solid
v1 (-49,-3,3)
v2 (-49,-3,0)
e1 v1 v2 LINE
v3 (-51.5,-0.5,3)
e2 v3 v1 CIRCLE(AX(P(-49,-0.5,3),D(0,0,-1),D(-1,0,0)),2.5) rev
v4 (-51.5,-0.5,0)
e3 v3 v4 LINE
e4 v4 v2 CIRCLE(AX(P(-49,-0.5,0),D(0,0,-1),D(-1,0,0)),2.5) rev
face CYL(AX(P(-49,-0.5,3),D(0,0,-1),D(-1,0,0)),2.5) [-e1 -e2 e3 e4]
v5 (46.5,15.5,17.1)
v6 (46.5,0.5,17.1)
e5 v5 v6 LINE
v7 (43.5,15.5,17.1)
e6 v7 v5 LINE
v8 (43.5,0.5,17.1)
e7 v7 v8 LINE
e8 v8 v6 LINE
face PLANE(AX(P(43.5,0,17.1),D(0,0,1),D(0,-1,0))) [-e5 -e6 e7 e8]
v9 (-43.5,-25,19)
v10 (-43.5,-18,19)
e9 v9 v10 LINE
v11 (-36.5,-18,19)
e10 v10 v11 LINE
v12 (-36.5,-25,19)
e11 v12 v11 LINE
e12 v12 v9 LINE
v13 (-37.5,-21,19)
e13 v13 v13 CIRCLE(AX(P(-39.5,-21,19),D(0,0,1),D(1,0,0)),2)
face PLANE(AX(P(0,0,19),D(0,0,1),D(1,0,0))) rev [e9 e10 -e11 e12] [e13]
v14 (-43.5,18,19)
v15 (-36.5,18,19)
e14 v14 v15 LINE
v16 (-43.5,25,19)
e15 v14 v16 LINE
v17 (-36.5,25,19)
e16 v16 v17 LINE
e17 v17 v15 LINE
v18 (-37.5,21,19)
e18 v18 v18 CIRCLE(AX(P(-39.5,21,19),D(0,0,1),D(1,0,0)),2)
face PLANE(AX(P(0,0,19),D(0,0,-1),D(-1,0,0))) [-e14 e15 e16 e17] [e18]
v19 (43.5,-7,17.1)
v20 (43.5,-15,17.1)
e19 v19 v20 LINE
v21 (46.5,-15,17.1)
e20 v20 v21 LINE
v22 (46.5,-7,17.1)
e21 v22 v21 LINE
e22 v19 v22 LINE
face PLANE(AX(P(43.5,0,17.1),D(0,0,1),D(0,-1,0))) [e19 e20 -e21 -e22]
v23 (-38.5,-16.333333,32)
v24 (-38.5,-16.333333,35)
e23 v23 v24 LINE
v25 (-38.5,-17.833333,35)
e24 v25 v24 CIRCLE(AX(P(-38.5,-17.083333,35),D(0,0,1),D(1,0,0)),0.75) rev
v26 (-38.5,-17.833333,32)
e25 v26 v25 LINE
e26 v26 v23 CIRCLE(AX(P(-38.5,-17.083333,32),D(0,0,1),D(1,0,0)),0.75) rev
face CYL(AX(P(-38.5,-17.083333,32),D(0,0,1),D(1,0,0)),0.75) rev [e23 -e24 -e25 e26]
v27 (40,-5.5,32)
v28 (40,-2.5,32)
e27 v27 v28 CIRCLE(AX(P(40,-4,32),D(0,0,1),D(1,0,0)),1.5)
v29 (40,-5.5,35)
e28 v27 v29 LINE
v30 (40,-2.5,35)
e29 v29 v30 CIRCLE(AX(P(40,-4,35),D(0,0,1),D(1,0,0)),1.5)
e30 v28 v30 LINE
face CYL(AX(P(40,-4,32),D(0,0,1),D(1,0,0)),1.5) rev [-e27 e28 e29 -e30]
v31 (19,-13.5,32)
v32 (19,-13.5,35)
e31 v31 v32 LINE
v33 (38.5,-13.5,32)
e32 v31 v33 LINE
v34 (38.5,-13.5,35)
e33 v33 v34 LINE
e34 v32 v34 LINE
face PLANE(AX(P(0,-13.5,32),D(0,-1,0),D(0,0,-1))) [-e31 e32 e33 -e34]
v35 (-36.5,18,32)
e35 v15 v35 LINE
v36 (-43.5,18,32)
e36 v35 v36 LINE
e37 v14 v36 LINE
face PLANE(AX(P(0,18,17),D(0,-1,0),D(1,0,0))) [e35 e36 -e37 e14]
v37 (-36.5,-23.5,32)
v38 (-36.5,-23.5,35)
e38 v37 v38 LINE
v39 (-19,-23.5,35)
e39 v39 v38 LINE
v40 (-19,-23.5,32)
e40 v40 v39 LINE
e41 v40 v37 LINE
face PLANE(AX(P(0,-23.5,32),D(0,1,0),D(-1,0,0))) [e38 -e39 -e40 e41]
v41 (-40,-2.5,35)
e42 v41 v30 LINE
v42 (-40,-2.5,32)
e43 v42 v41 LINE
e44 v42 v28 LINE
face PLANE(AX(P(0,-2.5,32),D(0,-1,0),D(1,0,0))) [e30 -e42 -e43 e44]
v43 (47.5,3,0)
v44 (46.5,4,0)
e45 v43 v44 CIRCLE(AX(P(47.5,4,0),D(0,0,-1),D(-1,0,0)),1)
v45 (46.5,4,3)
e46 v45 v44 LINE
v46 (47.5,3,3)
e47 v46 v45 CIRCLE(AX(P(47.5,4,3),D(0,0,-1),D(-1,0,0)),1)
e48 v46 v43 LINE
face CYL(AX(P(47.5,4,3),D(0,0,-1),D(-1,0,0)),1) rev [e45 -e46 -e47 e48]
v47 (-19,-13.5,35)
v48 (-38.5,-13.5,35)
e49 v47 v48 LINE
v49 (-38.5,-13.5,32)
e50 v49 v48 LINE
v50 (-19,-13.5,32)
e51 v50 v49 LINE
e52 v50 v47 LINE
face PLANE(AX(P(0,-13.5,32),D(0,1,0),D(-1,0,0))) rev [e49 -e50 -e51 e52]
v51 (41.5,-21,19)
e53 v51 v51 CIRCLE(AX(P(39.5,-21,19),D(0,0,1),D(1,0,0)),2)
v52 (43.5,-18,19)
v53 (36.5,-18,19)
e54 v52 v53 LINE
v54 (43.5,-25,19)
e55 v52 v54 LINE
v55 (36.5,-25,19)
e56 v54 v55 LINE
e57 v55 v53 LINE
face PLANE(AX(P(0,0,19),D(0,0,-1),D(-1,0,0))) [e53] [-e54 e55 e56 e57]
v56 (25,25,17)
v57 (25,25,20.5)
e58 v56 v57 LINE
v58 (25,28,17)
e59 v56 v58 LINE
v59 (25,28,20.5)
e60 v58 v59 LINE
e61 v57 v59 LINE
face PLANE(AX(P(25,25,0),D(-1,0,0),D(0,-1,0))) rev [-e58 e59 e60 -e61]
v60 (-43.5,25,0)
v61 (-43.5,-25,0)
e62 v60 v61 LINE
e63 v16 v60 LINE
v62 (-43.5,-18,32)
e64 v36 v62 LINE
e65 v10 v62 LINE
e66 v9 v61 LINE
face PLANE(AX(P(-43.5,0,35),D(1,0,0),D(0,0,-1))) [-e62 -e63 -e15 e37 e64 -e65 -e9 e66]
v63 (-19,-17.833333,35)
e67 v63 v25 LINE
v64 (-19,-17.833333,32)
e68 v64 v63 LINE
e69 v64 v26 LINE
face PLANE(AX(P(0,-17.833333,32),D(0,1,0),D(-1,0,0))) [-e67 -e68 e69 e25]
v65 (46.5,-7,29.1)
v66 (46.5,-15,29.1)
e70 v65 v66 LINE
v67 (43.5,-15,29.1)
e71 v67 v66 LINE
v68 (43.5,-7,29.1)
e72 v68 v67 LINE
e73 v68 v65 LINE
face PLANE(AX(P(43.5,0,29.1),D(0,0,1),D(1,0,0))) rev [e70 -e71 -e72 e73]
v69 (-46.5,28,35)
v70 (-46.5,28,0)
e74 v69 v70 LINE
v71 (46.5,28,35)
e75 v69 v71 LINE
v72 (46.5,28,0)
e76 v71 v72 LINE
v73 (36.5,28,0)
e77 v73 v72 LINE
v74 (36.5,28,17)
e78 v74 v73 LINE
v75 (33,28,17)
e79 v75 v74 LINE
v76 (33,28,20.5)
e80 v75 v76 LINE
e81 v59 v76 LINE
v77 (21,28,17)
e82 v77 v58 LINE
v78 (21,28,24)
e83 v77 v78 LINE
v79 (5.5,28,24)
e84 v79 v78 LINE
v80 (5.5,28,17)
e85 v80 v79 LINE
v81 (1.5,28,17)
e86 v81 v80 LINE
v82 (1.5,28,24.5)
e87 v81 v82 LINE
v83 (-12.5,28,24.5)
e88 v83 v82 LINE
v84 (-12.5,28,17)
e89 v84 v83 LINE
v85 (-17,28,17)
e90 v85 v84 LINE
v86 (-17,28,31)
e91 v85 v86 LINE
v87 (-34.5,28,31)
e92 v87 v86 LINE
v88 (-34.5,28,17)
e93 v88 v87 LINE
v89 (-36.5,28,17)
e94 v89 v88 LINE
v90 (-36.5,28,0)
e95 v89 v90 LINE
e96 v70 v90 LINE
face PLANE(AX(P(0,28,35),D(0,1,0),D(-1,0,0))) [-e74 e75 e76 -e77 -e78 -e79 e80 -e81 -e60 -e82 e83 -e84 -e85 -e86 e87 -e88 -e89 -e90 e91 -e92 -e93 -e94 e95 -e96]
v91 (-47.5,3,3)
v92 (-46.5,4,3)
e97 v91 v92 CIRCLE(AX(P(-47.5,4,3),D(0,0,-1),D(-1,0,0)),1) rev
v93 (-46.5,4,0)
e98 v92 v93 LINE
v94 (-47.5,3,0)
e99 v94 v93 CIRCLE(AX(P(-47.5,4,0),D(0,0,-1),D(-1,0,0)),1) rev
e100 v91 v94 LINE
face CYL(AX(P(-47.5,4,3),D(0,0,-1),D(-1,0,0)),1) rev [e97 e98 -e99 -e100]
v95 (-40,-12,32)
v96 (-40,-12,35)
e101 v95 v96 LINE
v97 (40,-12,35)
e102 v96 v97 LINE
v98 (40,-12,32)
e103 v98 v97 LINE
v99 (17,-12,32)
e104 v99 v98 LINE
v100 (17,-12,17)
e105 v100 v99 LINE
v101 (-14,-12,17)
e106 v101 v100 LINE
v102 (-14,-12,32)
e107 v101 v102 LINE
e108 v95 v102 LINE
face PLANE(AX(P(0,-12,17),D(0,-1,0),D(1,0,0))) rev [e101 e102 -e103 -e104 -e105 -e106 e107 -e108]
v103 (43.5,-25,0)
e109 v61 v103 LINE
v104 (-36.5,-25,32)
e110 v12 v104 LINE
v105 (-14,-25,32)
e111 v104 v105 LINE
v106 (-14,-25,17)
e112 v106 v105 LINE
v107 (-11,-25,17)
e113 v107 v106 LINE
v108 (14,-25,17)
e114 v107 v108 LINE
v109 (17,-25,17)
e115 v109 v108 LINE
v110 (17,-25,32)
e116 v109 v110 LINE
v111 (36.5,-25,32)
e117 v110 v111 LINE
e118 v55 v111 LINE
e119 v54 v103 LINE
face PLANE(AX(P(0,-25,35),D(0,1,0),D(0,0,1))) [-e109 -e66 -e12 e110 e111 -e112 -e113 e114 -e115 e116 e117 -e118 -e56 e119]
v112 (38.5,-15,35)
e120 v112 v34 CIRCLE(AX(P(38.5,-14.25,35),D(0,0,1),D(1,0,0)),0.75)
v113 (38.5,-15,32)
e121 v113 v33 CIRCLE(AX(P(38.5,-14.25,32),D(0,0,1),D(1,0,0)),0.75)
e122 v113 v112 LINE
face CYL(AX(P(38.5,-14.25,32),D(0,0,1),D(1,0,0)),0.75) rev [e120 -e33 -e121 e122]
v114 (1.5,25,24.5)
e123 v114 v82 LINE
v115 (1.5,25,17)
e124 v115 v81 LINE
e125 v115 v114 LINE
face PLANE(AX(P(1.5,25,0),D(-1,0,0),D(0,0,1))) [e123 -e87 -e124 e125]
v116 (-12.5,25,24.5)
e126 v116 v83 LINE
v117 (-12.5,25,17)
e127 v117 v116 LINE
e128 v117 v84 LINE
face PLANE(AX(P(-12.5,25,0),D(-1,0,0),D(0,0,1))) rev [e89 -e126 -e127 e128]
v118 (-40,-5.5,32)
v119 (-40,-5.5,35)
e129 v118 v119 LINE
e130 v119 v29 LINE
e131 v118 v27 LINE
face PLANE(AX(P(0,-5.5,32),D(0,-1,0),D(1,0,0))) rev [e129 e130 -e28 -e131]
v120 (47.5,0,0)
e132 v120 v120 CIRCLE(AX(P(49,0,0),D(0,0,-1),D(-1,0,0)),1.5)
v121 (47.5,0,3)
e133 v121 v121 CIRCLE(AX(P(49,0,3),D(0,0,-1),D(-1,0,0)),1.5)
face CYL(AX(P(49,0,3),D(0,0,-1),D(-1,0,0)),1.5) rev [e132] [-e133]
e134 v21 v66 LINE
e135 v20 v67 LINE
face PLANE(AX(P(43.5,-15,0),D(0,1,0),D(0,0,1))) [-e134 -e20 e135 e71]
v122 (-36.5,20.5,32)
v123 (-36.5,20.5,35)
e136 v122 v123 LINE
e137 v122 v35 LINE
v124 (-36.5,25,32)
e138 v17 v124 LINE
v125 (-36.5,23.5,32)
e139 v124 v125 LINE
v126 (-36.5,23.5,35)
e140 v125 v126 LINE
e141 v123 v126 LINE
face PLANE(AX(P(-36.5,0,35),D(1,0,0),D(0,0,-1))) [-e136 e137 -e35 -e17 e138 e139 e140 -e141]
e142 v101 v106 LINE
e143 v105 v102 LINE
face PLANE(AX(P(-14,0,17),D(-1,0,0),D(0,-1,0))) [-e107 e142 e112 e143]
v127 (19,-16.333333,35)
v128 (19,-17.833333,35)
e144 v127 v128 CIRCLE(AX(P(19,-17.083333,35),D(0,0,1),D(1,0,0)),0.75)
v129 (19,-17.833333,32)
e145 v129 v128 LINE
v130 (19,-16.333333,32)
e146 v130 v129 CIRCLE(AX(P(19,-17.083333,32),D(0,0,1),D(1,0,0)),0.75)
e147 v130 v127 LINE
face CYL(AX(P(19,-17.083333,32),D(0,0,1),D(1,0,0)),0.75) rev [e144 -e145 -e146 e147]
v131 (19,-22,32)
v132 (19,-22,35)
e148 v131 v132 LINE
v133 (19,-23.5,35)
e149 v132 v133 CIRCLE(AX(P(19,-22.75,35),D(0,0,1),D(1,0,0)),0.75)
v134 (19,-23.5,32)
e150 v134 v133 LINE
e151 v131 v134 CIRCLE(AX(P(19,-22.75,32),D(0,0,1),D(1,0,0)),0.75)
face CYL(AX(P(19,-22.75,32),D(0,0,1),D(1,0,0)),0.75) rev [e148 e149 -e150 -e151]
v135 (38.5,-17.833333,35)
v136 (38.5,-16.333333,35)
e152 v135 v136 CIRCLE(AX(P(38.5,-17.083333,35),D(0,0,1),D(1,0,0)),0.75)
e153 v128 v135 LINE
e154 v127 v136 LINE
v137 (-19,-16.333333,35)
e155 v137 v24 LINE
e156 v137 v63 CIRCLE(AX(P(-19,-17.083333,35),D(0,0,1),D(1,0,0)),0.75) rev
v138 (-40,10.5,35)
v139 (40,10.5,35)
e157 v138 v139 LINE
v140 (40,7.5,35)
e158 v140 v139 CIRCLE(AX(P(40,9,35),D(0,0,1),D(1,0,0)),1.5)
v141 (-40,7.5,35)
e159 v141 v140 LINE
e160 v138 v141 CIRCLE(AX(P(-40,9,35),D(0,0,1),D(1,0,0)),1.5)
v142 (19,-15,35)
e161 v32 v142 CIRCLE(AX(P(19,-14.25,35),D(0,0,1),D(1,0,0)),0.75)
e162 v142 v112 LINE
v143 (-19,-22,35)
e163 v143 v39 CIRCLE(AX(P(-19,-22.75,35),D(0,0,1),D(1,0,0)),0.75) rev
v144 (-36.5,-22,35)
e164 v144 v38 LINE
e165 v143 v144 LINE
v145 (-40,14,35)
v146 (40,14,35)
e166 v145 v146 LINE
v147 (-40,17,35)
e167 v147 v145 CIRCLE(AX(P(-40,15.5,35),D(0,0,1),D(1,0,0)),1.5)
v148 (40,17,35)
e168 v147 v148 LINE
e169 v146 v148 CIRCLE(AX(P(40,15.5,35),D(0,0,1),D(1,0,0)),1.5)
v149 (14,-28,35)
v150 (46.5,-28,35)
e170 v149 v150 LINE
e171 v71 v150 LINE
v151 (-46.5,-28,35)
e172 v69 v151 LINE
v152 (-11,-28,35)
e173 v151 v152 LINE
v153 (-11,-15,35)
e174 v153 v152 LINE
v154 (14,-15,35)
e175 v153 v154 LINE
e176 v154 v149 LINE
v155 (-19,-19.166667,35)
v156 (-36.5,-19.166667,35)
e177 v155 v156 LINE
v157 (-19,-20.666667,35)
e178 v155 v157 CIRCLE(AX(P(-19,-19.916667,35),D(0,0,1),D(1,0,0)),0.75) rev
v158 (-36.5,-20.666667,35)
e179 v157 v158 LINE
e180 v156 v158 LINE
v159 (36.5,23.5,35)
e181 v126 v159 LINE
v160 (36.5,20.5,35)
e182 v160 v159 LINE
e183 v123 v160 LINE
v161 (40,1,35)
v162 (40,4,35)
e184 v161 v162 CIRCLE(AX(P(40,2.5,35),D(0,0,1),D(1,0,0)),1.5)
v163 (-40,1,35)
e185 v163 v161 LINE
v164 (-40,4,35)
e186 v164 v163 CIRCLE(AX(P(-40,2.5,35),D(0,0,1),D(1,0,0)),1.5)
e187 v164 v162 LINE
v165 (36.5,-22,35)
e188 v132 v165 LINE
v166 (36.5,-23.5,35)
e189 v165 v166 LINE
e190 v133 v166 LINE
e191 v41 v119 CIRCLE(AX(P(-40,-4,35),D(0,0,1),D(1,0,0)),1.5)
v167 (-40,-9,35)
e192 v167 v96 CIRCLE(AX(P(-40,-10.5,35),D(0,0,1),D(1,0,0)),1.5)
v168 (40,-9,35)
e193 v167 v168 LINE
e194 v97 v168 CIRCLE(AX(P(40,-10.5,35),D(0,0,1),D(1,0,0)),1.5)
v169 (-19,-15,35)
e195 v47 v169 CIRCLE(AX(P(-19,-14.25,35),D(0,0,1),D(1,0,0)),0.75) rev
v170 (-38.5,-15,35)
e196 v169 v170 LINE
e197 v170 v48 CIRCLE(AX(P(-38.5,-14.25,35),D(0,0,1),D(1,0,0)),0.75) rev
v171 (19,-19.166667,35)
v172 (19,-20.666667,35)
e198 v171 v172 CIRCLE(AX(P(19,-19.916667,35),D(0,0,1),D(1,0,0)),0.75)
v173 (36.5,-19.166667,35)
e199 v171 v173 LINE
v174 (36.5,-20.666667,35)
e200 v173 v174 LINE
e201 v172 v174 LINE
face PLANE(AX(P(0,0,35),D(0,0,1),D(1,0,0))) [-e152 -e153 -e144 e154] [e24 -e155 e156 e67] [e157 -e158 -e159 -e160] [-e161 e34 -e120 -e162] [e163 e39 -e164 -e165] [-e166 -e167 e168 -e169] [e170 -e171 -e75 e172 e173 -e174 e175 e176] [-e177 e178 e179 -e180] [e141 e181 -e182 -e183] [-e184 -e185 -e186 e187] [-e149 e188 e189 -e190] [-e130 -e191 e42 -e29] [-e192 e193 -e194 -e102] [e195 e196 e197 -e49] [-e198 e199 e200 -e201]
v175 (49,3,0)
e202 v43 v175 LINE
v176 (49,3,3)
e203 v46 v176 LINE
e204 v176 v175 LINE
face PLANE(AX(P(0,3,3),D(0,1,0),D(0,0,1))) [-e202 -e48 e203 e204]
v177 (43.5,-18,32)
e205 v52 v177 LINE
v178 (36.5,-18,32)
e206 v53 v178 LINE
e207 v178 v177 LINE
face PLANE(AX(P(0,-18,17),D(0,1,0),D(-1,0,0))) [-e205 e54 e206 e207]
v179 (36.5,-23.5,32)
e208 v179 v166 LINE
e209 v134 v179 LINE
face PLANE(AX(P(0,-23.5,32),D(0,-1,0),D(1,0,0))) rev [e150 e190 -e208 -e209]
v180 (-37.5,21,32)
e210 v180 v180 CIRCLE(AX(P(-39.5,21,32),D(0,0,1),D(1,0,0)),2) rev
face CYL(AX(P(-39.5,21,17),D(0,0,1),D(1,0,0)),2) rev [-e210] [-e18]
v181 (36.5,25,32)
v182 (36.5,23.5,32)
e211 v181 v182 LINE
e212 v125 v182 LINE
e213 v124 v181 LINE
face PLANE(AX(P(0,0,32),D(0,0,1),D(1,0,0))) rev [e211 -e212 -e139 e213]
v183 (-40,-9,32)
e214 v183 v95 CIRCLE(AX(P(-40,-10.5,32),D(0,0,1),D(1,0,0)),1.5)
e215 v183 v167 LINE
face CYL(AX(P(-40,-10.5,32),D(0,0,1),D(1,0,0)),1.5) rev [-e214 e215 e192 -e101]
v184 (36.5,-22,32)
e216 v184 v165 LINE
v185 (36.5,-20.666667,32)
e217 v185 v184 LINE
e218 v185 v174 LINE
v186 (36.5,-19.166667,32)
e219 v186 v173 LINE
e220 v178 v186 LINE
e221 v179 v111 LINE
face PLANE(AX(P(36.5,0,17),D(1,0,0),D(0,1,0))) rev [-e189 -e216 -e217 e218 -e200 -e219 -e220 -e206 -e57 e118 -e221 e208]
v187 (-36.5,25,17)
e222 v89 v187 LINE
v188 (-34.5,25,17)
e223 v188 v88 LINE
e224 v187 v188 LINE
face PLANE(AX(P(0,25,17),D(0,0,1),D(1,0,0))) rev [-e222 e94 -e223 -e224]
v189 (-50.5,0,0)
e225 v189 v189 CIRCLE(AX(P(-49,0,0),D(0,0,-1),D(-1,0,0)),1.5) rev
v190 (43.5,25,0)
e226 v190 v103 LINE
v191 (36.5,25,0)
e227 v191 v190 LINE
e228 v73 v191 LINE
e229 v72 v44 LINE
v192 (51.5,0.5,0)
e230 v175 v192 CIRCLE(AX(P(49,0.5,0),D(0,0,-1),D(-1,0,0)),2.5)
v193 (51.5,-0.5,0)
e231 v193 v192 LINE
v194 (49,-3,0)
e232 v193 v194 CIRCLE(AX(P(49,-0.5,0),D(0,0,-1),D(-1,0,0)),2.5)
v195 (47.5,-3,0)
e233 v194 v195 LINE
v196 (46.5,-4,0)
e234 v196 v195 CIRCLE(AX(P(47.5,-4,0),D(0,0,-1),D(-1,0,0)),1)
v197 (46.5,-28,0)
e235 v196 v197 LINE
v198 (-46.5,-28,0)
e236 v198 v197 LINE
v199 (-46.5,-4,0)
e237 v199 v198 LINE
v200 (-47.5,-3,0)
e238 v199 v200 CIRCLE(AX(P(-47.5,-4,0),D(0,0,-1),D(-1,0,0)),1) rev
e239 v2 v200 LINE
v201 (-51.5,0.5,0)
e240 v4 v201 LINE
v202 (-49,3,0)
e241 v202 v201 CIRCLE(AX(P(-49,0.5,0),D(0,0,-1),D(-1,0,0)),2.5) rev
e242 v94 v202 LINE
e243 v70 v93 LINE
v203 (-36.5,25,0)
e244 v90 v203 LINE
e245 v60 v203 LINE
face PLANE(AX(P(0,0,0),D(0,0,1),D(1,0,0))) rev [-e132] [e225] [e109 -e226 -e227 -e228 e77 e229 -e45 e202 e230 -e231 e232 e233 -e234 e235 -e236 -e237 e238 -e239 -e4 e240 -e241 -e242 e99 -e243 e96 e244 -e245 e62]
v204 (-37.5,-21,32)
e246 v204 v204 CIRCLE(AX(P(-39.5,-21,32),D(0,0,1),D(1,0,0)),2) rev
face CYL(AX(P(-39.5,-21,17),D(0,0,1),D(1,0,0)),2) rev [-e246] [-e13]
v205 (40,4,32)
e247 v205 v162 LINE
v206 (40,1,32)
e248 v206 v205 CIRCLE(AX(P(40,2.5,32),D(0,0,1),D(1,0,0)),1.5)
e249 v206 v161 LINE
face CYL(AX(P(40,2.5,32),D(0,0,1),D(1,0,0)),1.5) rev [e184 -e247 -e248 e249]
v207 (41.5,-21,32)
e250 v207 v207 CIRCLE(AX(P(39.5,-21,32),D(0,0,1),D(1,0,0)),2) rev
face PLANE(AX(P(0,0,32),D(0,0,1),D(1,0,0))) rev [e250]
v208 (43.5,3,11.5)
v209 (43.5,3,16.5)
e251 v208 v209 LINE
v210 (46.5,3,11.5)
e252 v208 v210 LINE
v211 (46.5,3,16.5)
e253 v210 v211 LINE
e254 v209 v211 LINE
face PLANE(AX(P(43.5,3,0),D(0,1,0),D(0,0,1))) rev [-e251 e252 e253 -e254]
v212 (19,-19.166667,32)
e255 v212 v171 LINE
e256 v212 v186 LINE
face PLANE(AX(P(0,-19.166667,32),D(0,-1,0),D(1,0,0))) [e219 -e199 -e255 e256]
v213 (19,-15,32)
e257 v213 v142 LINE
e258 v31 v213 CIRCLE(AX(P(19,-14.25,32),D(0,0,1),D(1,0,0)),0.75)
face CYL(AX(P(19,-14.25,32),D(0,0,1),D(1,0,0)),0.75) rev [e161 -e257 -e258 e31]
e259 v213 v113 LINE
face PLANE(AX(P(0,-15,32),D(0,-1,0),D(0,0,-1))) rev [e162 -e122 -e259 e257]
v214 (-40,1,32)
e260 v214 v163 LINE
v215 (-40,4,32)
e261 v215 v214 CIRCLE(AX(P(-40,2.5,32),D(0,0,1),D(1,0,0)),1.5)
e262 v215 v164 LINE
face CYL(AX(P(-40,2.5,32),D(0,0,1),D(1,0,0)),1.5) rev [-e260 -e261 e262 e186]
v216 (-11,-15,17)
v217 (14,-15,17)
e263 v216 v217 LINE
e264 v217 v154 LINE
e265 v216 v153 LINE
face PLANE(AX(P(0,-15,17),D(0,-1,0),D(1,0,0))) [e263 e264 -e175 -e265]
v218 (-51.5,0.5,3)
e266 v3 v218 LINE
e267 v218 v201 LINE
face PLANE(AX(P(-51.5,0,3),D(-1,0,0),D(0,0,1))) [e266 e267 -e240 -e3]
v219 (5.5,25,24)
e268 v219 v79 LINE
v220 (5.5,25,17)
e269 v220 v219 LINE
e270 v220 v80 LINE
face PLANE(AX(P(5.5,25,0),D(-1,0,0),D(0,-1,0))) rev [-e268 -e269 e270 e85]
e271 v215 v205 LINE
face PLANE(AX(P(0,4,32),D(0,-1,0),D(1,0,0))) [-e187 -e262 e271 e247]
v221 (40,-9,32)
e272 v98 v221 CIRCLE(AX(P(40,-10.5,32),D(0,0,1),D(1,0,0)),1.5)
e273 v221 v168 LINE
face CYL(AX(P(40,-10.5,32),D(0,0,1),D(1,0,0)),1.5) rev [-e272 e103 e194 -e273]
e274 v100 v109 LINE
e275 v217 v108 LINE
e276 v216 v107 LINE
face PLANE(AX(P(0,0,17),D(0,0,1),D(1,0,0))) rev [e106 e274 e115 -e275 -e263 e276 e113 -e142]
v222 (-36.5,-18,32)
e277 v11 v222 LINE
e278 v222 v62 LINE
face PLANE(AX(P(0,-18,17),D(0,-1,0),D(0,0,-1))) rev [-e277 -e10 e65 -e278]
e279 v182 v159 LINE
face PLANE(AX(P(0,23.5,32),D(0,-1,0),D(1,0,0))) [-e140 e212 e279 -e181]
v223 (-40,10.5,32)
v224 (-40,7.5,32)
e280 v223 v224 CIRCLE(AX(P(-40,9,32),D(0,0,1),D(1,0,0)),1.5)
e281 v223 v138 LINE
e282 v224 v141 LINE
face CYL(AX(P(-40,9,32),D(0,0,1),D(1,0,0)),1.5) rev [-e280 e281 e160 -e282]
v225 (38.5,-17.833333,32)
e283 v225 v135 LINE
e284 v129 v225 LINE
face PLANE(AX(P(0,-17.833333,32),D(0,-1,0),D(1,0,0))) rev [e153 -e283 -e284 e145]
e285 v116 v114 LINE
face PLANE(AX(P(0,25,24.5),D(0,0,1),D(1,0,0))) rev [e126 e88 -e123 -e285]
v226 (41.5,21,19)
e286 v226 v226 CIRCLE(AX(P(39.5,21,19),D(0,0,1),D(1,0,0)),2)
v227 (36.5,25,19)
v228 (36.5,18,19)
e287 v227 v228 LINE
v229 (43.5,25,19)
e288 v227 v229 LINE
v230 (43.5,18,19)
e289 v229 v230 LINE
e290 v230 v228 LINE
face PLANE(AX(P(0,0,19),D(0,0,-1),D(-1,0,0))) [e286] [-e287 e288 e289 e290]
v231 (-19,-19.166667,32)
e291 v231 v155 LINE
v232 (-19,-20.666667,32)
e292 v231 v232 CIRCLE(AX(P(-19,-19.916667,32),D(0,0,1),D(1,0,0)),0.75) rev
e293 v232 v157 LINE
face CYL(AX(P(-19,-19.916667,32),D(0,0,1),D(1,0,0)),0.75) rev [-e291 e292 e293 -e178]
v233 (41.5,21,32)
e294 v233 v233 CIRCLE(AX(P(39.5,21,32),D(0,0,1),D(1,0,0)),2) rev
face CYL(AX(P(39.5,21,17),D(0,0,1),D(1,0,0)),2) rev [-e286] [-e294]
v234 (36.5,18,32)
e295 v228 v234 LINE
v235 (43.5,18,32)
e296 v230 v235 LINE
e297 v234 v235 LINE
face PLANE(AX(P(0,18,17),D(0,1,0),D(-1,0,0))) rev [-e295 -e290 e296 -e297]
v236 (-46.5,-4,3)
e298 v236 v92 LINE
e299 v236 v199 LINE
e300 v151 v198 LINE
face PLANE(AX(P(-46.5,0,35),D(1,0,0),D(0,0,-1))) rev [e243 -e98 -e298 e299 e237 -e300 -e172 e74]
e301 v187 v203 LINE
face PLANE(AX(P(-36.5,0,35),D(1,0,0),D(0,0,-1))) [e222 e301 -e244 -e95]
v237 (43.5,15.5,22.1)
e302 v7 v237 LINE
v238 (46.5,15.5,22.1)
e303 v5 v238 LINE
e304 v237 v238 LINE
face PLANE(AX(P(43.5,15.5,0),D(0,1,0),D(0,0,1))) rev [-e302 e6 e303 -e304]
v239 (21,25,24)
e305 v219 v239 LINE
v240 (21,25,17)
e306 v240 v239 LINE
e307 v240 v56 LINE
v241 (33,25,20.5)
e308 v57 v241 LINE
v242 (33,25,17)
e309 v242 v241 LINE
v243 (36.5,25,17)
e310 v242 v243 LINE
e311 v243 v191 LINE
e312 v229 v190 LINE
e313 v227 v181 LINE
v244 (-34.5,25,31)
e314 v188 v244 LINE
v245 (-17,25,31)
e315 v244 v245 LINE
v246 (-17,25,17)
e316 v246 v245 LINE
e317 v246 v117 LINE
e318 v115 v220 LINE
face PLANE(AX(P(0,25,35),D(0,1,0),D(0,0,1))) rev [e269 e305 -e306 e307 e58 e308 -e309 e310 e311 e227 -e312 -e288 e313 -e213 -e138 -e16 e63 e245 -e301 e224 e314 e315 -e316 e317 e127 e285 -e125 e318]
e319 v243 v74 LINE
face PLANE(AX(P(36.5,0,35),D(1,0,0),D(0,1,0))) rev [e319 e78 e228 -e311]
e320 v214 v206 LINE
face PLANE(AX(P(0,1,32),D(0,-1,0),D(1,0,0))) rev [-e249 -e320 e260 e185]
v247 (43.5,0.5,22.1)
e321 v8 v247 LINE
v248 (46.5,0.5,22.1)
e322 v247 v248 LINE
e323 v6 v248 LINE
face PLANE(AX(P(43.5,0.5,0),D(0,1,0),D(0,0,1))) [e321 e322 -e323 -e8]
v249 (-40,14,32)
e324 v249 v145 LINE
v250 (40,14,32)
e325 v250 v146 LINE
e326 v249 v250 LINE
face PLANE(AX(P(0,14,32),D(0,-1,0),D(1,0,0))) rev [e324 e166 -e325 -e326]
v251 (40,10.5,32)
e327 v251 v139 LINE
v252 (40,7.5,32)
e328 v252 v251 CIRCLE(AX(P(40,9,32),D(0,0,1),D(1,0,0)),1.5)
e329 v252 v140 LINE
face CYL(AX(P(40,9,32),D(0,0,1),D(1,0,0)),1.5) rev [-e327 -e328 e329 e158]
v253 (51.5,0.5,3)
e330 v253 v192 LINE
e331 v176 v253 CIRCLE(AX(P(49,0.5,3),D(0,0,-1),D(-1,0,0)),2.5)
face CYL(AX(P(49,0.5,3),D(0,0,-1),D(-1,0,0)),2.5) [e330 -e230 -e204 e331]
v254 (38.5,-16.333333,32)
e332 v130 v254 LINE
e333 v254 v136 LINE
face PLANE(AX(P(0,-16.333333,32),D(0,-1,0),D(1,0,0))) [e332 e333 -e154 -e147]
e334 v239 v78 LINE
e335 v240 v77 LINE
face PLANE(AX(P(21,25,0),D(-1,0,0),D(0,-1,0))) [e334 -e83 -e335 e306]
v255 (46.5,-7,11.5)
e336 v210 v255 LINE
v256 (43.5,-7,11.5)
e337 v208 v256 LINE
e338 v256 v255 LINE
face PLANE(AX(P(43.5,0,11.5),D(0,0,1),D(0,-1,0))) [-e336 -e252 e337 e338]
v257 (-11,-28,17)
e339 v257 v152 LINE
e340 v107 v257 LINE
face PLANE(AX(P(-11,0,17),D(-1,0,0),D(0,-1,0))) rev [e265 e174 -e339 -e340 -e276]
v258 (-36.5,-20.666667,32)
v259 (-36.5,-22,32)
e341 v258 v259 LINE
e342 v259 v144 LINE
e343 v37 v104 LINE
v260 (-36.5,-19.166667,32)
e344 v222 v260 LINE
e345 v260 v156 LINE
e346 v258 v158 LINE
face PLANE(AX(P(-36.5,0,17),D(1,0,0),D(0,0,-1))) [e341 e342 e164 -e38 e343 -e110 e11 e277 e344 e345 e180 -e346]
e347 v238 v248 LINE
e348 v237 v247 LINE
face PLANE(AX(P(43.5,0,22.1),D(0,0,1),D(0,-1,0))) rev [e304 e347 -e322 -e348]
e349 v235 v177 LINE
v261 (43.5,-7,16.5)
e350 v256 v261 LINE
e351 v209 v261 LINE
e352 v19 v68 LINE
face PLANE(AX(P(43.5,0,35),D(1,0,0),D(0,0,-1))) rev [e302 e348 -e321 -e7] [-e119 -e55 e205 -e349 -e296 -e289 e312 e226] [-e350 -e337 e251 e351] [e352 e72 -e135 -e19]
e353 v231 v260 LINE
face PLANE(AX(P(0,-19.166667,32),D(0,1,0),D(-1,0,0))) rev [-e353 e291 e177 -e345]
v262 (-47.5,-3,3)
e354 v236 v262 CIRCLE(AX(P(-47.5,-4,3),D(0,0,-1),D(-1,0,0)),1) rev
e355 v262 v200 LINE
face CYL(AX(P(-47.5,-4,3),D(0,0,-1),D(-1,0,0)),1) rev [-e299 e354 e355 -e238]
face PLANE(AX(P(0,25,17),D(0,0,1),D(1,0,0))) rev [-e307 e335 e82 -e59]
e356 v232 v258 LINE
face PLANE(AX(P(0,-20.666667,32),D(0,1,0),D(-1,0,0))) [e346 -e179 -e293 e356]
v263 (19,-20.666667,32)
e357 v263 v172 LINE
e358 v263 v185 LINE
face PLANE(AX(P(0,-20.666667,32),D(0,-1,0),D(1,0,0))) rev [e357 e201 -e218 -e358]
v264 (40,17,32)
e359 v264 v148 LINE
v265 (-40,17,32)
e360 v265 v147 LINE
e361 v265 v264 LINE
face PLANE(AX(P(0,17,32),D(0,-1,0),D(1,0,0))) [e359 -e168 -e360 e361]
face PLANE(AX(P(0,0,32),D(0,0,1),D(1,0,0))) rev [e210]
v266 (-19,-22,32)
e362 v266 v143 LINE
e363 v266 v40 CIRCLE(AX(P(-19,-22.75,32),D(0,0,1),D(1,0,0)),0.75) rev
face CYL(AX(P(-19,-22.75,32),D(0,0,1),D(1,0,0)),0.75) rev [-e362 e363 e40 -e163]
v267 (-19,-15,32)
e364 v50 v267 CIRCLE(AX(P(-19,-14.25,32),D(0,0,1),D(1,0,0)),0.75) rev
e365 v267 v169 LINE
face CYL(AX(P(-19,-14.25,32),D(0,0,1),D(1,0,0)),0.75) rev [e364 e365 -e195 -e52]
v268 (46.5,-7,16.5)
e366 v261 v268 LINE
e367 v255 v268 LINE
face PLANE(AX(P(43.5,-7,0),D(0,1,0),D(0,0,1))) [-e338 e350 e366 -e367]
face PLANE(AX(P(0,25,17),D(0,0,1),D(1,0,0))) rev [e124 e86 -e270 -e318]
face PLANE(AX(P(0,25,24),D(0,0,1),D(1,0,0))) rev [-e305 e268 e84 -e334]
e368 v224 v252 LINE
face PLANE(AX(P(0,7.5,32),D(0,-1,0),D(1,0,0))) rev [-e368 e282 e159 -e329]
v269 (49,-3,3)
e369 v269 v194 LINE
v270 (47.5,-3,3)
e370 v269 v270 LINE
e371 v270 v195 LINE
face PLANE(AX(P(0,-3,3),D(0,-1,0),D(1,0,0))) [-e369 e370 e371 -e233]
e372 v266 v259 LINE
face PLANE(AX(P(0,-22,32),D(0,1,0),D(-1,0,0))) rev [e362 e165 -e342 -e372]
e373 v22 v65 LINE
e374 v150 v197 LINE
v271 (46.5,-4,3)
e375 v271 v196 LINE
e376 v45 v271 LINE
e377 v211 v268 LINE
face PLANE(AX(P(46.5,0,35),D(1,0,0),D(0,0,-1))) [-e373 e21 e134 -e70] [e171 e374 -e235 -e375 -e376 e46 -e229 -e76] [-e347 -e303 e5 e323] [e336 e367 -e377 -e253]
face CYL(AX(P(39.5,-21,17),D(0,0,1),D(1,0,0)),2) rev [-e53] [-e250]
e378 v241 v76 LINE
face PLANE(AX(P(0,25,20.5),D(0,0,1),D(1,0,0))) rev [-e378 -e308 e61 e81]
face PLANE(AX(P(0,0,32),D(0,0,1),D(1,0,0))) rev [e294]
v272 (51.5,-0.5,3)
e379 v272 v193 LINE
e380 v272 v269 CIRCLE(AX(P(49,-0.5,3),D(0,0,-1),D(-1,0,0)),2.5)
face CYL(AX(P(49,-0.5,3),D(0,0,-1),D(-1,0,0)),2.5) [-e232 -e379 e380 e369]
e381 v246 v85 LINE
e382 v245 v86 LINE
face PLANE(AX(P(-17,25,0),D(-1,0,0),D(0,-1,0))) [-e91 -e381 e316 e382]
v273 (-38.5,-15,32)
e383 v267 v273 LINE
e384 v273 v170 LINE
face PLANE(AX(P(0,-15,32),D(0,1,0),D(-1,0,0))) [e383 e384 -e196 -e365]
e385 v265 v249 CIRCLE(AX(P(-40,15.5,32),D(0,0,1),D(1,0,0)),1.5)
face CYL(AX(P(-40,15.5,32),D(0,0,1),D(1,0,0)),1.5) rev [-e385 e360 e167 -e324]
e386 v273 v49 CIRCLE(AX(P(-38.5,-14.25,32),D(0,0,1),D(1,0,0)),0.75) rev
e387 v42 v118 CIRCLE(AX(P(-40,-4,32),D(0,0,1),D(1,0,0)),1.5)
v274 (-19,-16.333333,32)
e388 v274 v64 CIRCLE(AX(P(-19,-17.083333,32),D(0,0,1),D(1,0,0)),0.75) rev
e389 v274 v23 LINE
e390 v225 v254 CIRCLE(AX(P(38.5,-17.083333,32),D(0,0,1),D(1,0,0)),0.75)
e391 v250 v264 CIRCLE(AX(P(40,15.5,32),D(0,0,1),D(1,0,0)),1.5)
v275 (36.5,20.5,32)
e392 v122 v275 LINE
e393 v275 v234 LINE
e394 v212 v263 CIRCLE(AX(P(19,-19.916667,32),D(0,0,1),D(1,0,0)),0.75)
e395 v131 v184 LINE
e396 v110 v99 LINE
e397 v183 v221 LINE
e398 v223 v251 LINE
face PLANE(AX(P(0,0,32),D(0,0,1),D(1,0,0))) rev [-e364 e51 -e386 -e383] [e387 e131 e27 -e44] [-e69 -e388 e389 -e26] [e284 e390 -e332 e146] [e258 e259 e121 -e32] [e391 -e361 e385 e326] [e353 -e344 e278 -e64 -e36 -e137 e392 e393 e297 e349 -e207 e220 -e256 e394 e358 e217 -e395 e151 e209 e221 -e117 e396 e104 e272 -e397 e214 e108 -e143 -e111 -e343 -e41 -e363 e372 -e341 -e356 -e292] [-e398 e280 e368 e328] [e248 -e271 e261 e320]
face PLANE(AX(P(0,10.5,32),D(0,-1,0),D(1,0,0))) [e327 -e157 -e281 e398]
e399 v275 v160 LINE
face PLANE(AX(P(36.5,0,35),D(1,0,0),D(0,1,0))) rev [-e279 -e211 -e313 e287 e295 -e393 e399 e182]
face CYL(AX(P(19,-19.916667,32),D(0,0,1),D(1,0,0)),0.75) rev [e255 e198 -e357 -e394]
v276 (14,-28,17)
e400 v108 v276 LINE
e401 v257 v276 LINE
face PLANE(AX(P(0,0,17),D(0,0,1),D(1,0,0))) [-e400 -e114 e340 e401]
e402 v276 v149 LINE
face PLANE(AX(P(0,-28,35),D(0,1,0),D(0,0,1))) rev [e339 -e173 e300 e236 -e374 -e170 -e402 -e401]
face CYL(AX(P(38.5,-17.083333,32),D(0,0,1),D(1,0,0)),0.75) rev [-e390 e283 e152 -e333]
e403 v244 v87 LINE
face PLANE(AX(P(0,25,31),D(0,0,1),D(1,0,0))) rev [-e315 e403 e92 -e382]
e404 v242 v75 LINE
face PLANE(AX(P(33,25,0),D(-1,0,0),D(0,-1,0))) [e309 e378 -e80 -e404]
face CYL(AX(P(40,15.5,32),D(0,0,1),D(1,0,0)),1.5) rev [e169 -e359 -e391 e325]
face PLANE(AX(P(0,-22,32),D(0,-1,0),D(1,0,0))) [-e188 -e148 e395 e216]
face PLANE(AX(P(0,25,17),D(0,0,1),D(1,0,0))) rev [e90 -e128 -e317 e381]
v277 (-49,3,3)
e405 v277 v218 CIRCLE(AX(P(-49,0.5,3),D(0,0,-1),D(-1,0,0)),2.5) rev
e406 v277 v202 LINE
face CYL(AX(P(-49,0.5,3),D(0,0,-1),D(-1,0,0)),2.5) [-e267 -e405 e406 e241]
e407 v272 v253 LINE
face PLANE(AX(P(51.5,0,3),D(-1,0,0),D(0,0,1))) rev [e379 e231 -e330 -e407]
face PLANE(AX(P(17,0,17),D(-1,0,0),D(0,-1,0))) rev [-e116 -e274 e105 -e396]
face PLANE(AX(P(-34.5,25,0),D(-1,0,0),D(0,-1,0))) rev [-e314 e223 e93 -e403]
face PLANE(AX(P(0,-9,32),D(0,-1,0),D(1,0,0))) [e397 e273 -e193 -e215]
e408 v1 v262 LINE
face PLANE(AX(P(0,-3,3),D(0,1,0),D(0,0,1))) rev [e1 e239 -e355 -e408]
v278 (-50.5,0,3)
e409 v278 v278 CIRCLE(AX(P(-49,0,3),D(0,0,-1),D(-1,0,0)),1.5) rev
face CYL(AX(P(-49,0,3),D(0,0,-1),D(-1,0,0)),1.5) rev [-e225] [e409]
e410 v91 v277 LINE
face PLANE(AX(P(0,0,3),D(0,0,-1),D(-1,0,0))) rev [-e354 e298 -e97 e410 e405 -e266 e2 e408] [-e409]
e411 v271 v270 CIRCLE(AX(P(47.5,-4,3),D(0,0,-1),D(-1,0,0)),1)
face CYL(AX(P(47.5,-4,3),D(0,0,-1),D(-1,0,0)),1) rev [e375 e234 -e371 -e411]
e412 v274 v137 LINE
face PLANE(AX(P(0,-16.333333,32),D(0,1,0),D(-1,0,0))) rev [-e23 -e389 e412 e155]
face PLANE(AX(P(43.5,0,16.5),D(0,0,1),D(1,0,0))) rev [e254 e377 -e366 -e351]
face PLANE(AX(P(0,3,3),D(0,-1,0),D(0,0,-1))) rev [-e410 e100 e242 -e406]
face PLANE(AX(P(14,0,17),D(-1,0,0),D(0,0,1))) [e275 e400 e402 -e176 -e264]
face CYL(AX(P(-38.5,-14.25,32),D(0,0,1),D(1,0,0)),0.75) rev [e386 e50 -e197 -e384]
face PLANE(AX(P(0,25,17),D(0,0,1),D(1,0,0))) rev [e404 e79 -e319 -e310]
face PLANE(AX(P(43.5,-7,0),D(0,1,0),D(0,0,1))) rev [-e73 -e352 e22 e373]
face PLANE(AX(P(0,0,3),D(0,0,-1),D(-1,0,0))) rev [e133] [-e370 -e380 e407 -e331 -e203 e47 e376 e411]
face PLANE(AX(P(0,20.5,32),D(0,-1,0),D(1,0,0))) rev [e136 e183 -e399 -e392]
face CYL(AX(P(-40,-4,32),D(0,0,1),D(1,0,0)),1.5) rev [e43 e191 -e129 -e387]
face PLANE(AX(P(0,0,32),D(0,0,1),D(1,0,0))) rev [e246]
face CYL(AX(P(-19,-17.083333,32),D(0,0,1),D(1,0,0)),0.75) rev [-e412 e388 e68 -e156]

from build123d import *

# Parameters (mm, degrees)
EXTRUDE_1_DEPTH     = 35
CUT_EXTRUDE_1_DEPTH = 18
SKETCH_3_3_W        = 7
SKETCH_3_3_H        = 7
SKETCH_3_3_R        = 2
EXTRUDE_2_DEPTH     = 18
SKETCH_2_W          = 7
SKETCH_2_H          = 15.5
SKETCH_2_H_2        = 1.5
SKETCH_2_W_2        = 3
EXTRUDE_3_DEPTH     = 3
SKETCH_4_W          = 5
SKETCH_4_H          = 15
SKETCH_4_W_2        = 4
SKETCH_4_H_2        = 10
SKETCH_4_W_3        = 12
SKETCH_4_H_3        = 8
SKETCH_4_W_4        = 1
CUT_EXTRUDE_2_DEPTH = 3
CUT_EXTRUDE_START   = -16
SKETCH_3_5_W        = 7
SKETCH_3_5_H        = 7
SKETCH_3_5_R        = 2
CUT_EXTRUDE_3_DEPTH = 2
SKETCH_5_W          = 93
SKETCH_5_H          = 56
EXTRUDE_4_DEPTH     = 3
SKETCH_3_7_W        = 25
SKETCH_3_7_H        = 3
SKETCH_3_7_H_2      = 10
SKETCH_3_7_W_2      = 4
SKETCH_3_7_H_3      = 2.5
CUT_EXTRUDE_4_DEPTH = 18
SKETCH_6_W          = 73
SKETCH_6_H          = 3
CUT_EXTRUDE_5_DEPTH = 3
SKETCH_8_R          = 1.5
EXTRUDE_5_DEPTH     = 3


# Read off the part's stored shape, not the designer's step: 凸台-拉伸1
with BuildPart() as part:
    # 凸台-拉伸1 outline → 凸台-拉伸1 (new body)
    with BuildSketch(Plane.XY):
        Polygon((43.5, -25), (-43.5, -25), (-43.5, 25), (-36.5, 25), (-36.5, 28), (-46.5, 28), (-46.5, -28), (46.5, -28), (46.5, 28), (36.5, 28), (36.5, 25), (43.5, 25), align=None)
    extrude(amount=EXTRUDE_1_DEPTH)

    # 草图3 → 切除-拉伸1 (cut)
    with BuildSketch(Plane.XY.offset(35)):
        Polygon((-46.5, -28), (-36.5, -28), (-36.5, -25), (-43.5, -25), (-43.5, -18), (-46.5, -18), align=None)
        Polygon((36.5, -25), (36.5, -28), (46.5, -28), (46.5, 18), (43.5, 18), (43.5, -25), align=None)
        Polygon((-43.5, 25), (-36.5, 25), (-36.5, 28), (-46.5, 28), (-46.5, 18), (-43.5, 18), align=None)
    extrude(amount=-CUT_EXTRUDE_1_DEPTH, mode=Mode.SUBTRACT)

    # 草图3<3> → 凸台-拉伸2 (add)
    # profile 1 of 9: a face of its own
    with BuildSketch(Plane.XY.offset(35)):
        with Locations((-40, 21.5)):
            Rectangle(SKETCH_3_3_W, SKETCH_3_3_H)
        with Locations((-39.5, 21)):
            Circle(SKETCH_3_3_R, mode=Mode.SUBTRACT)
    # profile 2 of 9: a face of its own
    with BuildSketch(Plane.XY.offset(35)):
        with Locations((-40, -21.5)):
            Rectangle(SKETCH_3_3_W, SKETCH_3_3_H)
        with Locations((-39.5, -21)):
            Circle(SKETCH_3_3_R, mode=Mode.SUBTRACT)
    # profile 3 of 9: a face of its own
    with BuildSketch(Plane.XY.offset(35)):
        with Locations((40, -21.5)):
            Rectangle(SKETCH_3_3_W, SKETCH_3_3_H)
        with Locations((39.5, -21)):
            Circle(SKETCH_3_3_R, mode=Mode.SUBTRACT)
    # profile 4 of 9: a face of its own
    with BuildSketch(Plane.XY.offset(35)):
        with Locations((40, 21.5)):
            Rectangle(SKETCH_3_3_W, SKETCH_3_3_H)
        with Locations((39.5, 21)):
            Circle(SKETCH_3_3_R, mode=Mode.SUBTRACT)
    # profile 5 of 9: a face of its own
    with BuildSketch(Plane.XY.offset(35)):
        Polygon((-46.5, -28), (-36.5, -28), (-36.5, -25), (-43.5, -25), (-43.5, -18), (-46.5, -18), align=None)
    # profile 6 of 9: a face of its own
    with BuildSketch(Plane.XY.offset(35)):
        Polygon((36.5, -25), (36.5, -28), (46.5, -28), (46.5, -18), (43.5, -18), (43.5, -25), align=None)
    # profile 7 of 9: a face of its own
    with BuildSketch(Plane.XY.offset(35)):
        Polygon((43.5, -18), (46.5, -18), (46.5, 18), (43.5, 18), (43.5, 17), (43.5, 15), (43.5, 1), (43.5, -7.5), (43.5, -14.5), (43.5, -17), align=None)
    # profile 8 of 9: a face of its own
    with BuildSketch(Plane.XY.offset(35)):
        Polygon((-43.5, 25), (-36.5, 25), (-36.5, 28), (-46.5, 28), (-46.5, 18), (-43.5, 18), align=None)
    # profile 9 of 9: a face of its own
    with BuildSketch(Plane.XY.offset(35)):
        Polygon((-11, -25), (-11, -15), (14, -15), (14, -25), (17, -25), (17, -12), (-14, -12), (-14, -25), align=None)
    extrude(amount=-EXTRUDE_2_DEPTH)

    # 草图2 → 凸台-拉伸3 (add)
    with BuildSketch(Plane(origin=(0, 28, 0), x_dir=(1, 0, 0), z_dir=(0, 1, 0))):
        Polygon((-43.5, -17), (-46.5, -17), (-46.5, -35), (36.5, -35), (36.5, -32.5), (-43.5, -32.5), align=None)
        Polygon((36.5, -32.5), (36.5, -17), (33, -17), (33, -20.5), (25, -20.5), (25, -17), (21, -17), (21, -24), (5.5, -24), (5.5, -17), (1.5, -17), (1.5, -24.5), (-12.5, -24.5), (-12.5, -17), (-17, -17), (-17, -31), (-34.5, -31), (-34.5, -17), (-43.5, -17), (-43.5, -32.5), align=None)
        Polygon((46.5, -35), (46.5, -17), (43.5, -17), (43.5, -32.5), (36.5, -32.5), (36.5, -35), align=None)
        with Locations((40, -24.75)):
            Rectangle(SKETCH_2_W, SKETCH_2_H)
        with Locations((40, -16.25)):
            Rectangle(SKETCH_2_W, SKETCH_2_H_2)
        with Locations((45, -16.25)):
            Rectangle(SKETCH_2_W_2, SKETCH_2_H_2)
        with Locations((-45, -16.25)):
            Rectangle(SKETCH_2_W_2, SKETCH_2_H_2)
    extrude(amount=-EXTRUDE_3_DEPTH)

    # 草图4 → 切除-拉伸2 (cut)
    with BuildSketch(Plane(origin=(46.5, 0, 0), x_dir=(0, 0, -1), z_dir=(1, 0, 0))):
        with Locations((-19.6, 8)):
            Rectangle(SKETCH_4_W, SKETCH_4_H)
        with Locations((-13.5, -2)):
            Rectangle(SKETCH_4_W_2, SKETCH_4_H_2)
        with Locations((-23.1, -11)):
            Rectangle(SKETCH_4_W_3, SKETCH_4_H_3)
        with Locations((-16, -2)):
            Rectangle(SKETCH_4_W_4, SKETCH_4_H_2)
    extrude(amount=-CUT_EXTRUDE_2_DEPTH, mode=Mode.SUBTRACT)

    # 草图3<5> → 切除-拉伸3 (cut)
    # profile 1 of 4: a face of its own
    with BuildSketch(Plane.XY.offset(35).offset(CUT_EXTRUDE_START)):
        with Locations((-40, 21.5)):
            Rectangle(SKETCH_3_5_W, SKETCH_3_5_H)
        with Locations((-39.5, 21)):
            Circle(SKETCH_3_5_R, mode=Mode.SUBTRACT)
    # profile 2 of 4: a face of its own
    with BuildSketch(Plane.XY.offset(35).offset(CUT_EXTRUDE_START)):
        with Locations((-40, -21.5)):
            Rectangle(SKETCH_3_5_W, SKETCH_3_5_H)
        with Locations((-39.5, -21)):
            Circle(SKETCH_3_5_R, mode=Mode.SUBTRACT)
    # profile 3 of 4: a face of its own
    with BuildSketch(Plane.XY.offset(35).offset(CUT_EXTRUDE_START)):
        with Locations((40, -21.5)):
            Rectangle(SKETCH_3_5_W, SKETCH_3_5_H)
        with Locations((39.5, -21)):
            Circle(SKETCH_3_5_R, mode=Mode.SUBTRACT)
    # profile 4 of 4: a face of its own
    with BuildSketch(Plane.XY.offset(35).offset(CUT_EXTRUDE_START)):
        with Locations((40, 21.5)):
            Rectangle(SKETCH_3_5_W, SKETCH_3_5_H)
        with Locations((39.5, 21)):
            Circle(SKETCH_3_5_R, mode=Mode.SUBTRACT)
    extrude(amount=-CUT_EXTRUDE_3_DEPTH, mode=Mode.SUBTRACT)

    # 草图5 → 凸台-拉伸4 (add)
    with BuildSketch(Plane.XY.offset(35)):
        Rectangle(SKETCH_5_W, SKETCH_5_H)
    extrude(amount=-EXTRUDE_4_DEPTH)

    # 草图3<7> → 切除-拉伸4 (cut)
    # profile 1 of 8: a face of its own
    with BuildSketch(Plane.XY.offset(35)):
        with Locations((1.5, -26.5)):
            Rectangle(SKETCH_3_7_W, SKETCH_3_7_H)
    # profile 2 of 8: a face of its own
    with BuildSketch(Plane.XY.offset(35)):
        with Locations((1.5, -20)):
            Rectangle(SKETCH_3_7_W, SKETCH_3_7_H_2)
        with Locations((-6.5, -22.25)):
            Rectangle(SKETCH_3_7_W_2, SKETCH_3_7_H_3, mode=Mode.SUBTRACT)
        with Locations((1.5, -22.25)):
            Rectangle(SKETCH_3_7_W_2, SKETCH_3_7_H_3, mode=Mode.SUBTRACT)
        with Locations((9.5, -22.25)):
            Rectangle(SKETCH_3_7_W_2, SKETCH_3_7_H_3, mode=Mode.SUBTRACT)
    # profile 3 of 8: a face of its own
    with BuildSketch(Plane.XY.offset(35)):
        with Locations((-6.5, -22.25)):
            Rectangle(SKETCH_3_7_W_2, SKETCH_3_7_H_3)
        with BuildLine():
            ThreePointArc((-5.5, -23), (-4.75, -22.25), (-5.5, -21.5))
            Line((-5.5, -21.5), (-7.5, -21.5))
            ThreePointArc((-7.5, -21.5), (-8.25, -22.25), (-7.5, -23))
            Line((-7.5, -23), (-5.5, -23))
        make_face(mode=Mode.SUBTRACT)
    # profile 4 of 8: a face of its own
    with BuildSketch(Plane.XY.offset(35)):
        with BuildLine():
            Line((-7.5, -23), (-5.5, -23))
            ThreePointArc((-5.5, -23), (-4.75, -22.25), (-5.5, -21.5))
            Line((-5.5, -21.5), (-7.5, -21.5))
            ThreePointArc((-7.5, -21.5), (-8.25, -22.25), (-7.5, -23))
        make_face()
    # profile 5 of 8: a face of its own
    with BuildSketch(Plane.XY.offset(35)):
        with Locations((1.5, -22.25)):
            Rectangle(SKETCH_3_7_W_2, SKETCH_3_7_H_3)
        with BuildLine():
            ThreePointArc((2.5, -23), (3.25, -22.25), (2.5, -21.5))
            Line((2.5, -21.5), (0.5, -21.5))
            ThreePointArc((0.5, -21.5), (-0.25, -22.25), (0.5, -23))
            Line((0.5, -23), (2.5, -23))
        make_face(mode=Mode.SUBTRACT)
    # profile 6 of 8: a face of its own
    with BuildSketch(Plane.XY.offset(35)):
        with BuildLine():
            Line((0.5, -23), (2.5, -23))
            ThreePointArc((2.5, -23), (3.25, -22.25), (2.5, -21.5))
            Line((2.5, -21.5), (0.5, -21.5))
            ThreePointArc((0.5, -21.5), (-0.25, -22.25), (0.5, -23))
        make_face()
    # profile 7 of 8: a face of its own
    with BuildSketch(Plane.XY.offset(35)):
        with Locations((9.5, -22.25)):
            Rectangle(SKETCH_3_7_W_2, SKETCH_3_7_H_3)
        with BuildLine():
            ThreePointArc((10.5, -23), (11.25, -22.25), (10.5, -21.5))
            Line((10.5, -21.5), (8.5, -21.5))
            ThreePointArc((8.5, -21.5), (7.75, -22.25), (8.5, -23))
            Line((8.5, -23), (10.5, -23))
        make_face(mode=Mode.SUBTRACT)
    # profile 8 of 8: a face of its own
    with BuildSketch(Plane.XY.offset(35)):
        with BuildLine():
            Line((8.5, -23), (10.5, -23))
            ThreePointArc((10.5, -23), (11.25, -22.25), (10.5, -21.5))
            Line((10.5, -21.5), (8.5, -21.5))
            ThreePointArc((8.5, -21.5), (7.75, -22.25), (8.5, -23))
        make_face()
    extrude(amount=-CUT_EXTRUDE_4_DEPTH, mode=Mode.SUBTRACT)

    # 草图6 → 切除-拉伸5 (cut)
    with BuildSketch(Plane.XY.offset(35)):
        with Locations((0, 22)):
            Rectangle(SKETCH_6_W, SKETCH_6_H)
        with BuildLine():
            Line((-19, -19.166666667), (-36.5, -19.166666667))
            Line((-36.5, -19.166666667), (-36.5, -20.666666667))
            Line((-36.5, -20.666666667), (-19, -20.666666667))
            ThreePointArc((-19, -20.666666667), (-18.25, -19.916666667), (-19, -19.166666667))
        make_face()
        with BuildLine():
            Line((-36.5, -22), (-36.5, -23.5))
            Line((-36.5, -23.5), (-19, -23.5))
            ThreePointArc((-19, -23.5), (-18.25, -22.75), (-19, -22))
            Line((-19, -22), (-36.5, -22))
        make_face()
        with BuildLine():
            Line((19, -23.5), (36.5, -23.5))
            Line((36.5, -23.5), (36.5, -22))
            Line((36.5, -22), (19, -22))
            ThreePointArc((19, -22), (18.25, -22.75), (19, -23.5))
        make_face()
        with BuildLine():
            Line((36.5, -20.666666667), (36.5, -19.166666667))
            Line((36.5, -19.166666667), (19, -19.166666667))
            ThreePointArc((19, -19.166666667), (18.25, -19.916666667), (19, -20.666666667))
            Line((19, -20.666666667), (36.5, -20.666666667))
        make_face()
        with BuildLine():
            Line((40, 17), (-40, 17))
            ThreePointArc((-40, 17), (-41.5, 15.5), (-40, 14))
            Line((-40, 14), (40, 14))
            ThreePointArc((40, 14), (41.5, 15.5), (40, 17))
        make_face()
        with BuildLine():
            Line((40, 10.5), (-40, 10.5))
            ThreePointArc((-40, 10.5), (-41.5, 9), (-40, 7.5))
            Line((-40, 7.5), (40, 7.5))
            ThreePointArc((40, 7.5), (41.5, 9), (40, 10.5))
        make_face()
        with BuildLine():
            Line((40, 4), (-40, 4))
            ThreePointArc((-40, 4), (-41.5, 2.5), (-40, 1))
            Line((-40, 1), (40, 1))
            ThreePointArc((40, 1), (41.5, 2.5), (40, 4))
        make_face()
        with BuildLine():
            Line((40, -2.5), (-40, -2.5))
            ThreePointArc((-40, -2.5), (-41.5, -4), (-40, -5.5))
            Line((-40, -5.5), (40, -5.5))
            ThreePointArc((40, -5.5), (41.5, -4), (40, -2.5))
        make_face()
        with BuildLine():
            Line((40, -9), (-40, -9))
            ThreePointArc((-40, -9), (-41.5, -10.5), (-40, -12))
            Line((-40, -12), (40, -12))
            ThreePointArc((40, -12), (41.5, -10.5), (40, -9))
        make_face()
        with BuildLine():
            Line((38.5, -13.5), (19, -13.5))
            ThreePointArc((19, -13.5), (18.25, -14.25), (19, -15))
            Line((19, -15), (38.5, -15))
            ThreePointArc((38.5, -15), (39.25, -14.25), (38.5, -13.5))
        make_face()
        with BuildLine():
            Line((38.5, -16.333333333), (19, -16.333333333))
            ThreePointArc((19, -16.333333333), (18.25, -17.083333333), (19, -17.833333333))
            Line((19, -17.833333333), (38.5, -17.833333333))
            ThreePointArc((38.5, -17.833333333), (39.25, -17.083333333), (38.5, -16.333333333))
        make_face()
        with BuildLine():
            ThreePointArc((-19, -17.833333333), (-18.25, -17.083333333), (-19, -16.333333333))
            Line((-19, -16.333333333), (-38.5, -16.333333333))
            ThreePointArc((-38.5, -16.333333333), (-39.25, -17.083333333), (-38.5, -17.833333333))
            Line((-38.5, -17.833333333), (-19, -17.833333333))
        make_face()
        with BuildLine():
            ThreePointArc((-19, -15), (-18.25, -14.25), (-19, -13.5))
            Line((-19, -13.5), (-38.5, -13.5))
            ThreePointArc((-38.5, -13.5), (-39.25, -14.25), (-38.5, -15))
            Line((-38.5, -15), (-19, -15))
        make_face()
    extrude(amount=-CUT_EXTRUDE_5_DEPTH, mode=Mode.SUBTRACT)

    # 草图8 → 凸台-拉伸5 (add)
    # profile 1 of 2: a face of its own
    with BuildSketch(Plane(origin=(0, 0, 0), x_dir=(-1, 0, 0), z_dir=(0, 0, -1))):
        with BuildLine():
            ThreePointArc((47.5, 3), (46.792893219, 3.292893219), (46.5, 4))
            Line((46.5, 4), (46.5, 3))
            Line((46.5, 3), (46.5, -3))
            Line((46.5, -3), (46.5, -4))
            ThreePointArc((46.5, -4), (46.792893219, -3.292893219), (47.5, -3))
            Line((47.5, -3), (47.899019222, -3))
            Line((47.899019222, -3), (49, -3))
            ThreePointArc((49, -3), (50.767766953, -2.267766953), (51.5, -0.5))
            Line((51.5, -0.5), (51.5, 0.5))
            ThreePointArc((51.5, 0.5), (50.767766953, 2.267766953), (49, 3))
            Line((49, 3), (47.899019222, 3))
            Line((47.899019222, 3), (47.5, 3))
        make_face()
        with Locations((49, 0)):
            Circle(SKETCH_8_R, mode=Mode.SUBTRACT)
    # profile 2 of 2: a face of its own
    with BuildSketch(Plane(origin=(0, 0, 0), x_dir=(-1, 0, 0), z_dir=(0, 0, -1))):
        with BuildLine():
            Line((-46.5, 3), (-46.5, 4))
            ThreePointArc((-46.5, 4), (-46.792893219, 3.292893219), (-47.5, 3))
            Line((-47.5, 3), (-47.899019222, 3))
            Line((-47.899019222, 3), (-49, 3))
            ThreePointArc((-49, 3), (-50.767766953, 2.267766953), (-51.5, 0.5))
            Line((-51.5, 0.5), (-51.5, -0.5))
            ThreePointArc((-51.5, -0.5), (-50.767766953, -2.267766953), (-49, -3))
            Line((-49, -3), (-47.899019222, -3))
            Line((-47.899019222, -3), (-47.5, -3))
            ThreePointArc((-47.5, -3), (-46.792893219, -3.292893219), (-46.5, -4))
            Line((-46.5, -4), (-46.5, -3))
            Line((-46.5, -3), (-46.5, 3))
        make_face()
        with Locations((-49, 0)):
            Circle(SKETCH_8_R, mode=Mode.SUBTRACT)
    extrude(amount=-EXTRUDE_5_DEPTH)


solid = part.part
